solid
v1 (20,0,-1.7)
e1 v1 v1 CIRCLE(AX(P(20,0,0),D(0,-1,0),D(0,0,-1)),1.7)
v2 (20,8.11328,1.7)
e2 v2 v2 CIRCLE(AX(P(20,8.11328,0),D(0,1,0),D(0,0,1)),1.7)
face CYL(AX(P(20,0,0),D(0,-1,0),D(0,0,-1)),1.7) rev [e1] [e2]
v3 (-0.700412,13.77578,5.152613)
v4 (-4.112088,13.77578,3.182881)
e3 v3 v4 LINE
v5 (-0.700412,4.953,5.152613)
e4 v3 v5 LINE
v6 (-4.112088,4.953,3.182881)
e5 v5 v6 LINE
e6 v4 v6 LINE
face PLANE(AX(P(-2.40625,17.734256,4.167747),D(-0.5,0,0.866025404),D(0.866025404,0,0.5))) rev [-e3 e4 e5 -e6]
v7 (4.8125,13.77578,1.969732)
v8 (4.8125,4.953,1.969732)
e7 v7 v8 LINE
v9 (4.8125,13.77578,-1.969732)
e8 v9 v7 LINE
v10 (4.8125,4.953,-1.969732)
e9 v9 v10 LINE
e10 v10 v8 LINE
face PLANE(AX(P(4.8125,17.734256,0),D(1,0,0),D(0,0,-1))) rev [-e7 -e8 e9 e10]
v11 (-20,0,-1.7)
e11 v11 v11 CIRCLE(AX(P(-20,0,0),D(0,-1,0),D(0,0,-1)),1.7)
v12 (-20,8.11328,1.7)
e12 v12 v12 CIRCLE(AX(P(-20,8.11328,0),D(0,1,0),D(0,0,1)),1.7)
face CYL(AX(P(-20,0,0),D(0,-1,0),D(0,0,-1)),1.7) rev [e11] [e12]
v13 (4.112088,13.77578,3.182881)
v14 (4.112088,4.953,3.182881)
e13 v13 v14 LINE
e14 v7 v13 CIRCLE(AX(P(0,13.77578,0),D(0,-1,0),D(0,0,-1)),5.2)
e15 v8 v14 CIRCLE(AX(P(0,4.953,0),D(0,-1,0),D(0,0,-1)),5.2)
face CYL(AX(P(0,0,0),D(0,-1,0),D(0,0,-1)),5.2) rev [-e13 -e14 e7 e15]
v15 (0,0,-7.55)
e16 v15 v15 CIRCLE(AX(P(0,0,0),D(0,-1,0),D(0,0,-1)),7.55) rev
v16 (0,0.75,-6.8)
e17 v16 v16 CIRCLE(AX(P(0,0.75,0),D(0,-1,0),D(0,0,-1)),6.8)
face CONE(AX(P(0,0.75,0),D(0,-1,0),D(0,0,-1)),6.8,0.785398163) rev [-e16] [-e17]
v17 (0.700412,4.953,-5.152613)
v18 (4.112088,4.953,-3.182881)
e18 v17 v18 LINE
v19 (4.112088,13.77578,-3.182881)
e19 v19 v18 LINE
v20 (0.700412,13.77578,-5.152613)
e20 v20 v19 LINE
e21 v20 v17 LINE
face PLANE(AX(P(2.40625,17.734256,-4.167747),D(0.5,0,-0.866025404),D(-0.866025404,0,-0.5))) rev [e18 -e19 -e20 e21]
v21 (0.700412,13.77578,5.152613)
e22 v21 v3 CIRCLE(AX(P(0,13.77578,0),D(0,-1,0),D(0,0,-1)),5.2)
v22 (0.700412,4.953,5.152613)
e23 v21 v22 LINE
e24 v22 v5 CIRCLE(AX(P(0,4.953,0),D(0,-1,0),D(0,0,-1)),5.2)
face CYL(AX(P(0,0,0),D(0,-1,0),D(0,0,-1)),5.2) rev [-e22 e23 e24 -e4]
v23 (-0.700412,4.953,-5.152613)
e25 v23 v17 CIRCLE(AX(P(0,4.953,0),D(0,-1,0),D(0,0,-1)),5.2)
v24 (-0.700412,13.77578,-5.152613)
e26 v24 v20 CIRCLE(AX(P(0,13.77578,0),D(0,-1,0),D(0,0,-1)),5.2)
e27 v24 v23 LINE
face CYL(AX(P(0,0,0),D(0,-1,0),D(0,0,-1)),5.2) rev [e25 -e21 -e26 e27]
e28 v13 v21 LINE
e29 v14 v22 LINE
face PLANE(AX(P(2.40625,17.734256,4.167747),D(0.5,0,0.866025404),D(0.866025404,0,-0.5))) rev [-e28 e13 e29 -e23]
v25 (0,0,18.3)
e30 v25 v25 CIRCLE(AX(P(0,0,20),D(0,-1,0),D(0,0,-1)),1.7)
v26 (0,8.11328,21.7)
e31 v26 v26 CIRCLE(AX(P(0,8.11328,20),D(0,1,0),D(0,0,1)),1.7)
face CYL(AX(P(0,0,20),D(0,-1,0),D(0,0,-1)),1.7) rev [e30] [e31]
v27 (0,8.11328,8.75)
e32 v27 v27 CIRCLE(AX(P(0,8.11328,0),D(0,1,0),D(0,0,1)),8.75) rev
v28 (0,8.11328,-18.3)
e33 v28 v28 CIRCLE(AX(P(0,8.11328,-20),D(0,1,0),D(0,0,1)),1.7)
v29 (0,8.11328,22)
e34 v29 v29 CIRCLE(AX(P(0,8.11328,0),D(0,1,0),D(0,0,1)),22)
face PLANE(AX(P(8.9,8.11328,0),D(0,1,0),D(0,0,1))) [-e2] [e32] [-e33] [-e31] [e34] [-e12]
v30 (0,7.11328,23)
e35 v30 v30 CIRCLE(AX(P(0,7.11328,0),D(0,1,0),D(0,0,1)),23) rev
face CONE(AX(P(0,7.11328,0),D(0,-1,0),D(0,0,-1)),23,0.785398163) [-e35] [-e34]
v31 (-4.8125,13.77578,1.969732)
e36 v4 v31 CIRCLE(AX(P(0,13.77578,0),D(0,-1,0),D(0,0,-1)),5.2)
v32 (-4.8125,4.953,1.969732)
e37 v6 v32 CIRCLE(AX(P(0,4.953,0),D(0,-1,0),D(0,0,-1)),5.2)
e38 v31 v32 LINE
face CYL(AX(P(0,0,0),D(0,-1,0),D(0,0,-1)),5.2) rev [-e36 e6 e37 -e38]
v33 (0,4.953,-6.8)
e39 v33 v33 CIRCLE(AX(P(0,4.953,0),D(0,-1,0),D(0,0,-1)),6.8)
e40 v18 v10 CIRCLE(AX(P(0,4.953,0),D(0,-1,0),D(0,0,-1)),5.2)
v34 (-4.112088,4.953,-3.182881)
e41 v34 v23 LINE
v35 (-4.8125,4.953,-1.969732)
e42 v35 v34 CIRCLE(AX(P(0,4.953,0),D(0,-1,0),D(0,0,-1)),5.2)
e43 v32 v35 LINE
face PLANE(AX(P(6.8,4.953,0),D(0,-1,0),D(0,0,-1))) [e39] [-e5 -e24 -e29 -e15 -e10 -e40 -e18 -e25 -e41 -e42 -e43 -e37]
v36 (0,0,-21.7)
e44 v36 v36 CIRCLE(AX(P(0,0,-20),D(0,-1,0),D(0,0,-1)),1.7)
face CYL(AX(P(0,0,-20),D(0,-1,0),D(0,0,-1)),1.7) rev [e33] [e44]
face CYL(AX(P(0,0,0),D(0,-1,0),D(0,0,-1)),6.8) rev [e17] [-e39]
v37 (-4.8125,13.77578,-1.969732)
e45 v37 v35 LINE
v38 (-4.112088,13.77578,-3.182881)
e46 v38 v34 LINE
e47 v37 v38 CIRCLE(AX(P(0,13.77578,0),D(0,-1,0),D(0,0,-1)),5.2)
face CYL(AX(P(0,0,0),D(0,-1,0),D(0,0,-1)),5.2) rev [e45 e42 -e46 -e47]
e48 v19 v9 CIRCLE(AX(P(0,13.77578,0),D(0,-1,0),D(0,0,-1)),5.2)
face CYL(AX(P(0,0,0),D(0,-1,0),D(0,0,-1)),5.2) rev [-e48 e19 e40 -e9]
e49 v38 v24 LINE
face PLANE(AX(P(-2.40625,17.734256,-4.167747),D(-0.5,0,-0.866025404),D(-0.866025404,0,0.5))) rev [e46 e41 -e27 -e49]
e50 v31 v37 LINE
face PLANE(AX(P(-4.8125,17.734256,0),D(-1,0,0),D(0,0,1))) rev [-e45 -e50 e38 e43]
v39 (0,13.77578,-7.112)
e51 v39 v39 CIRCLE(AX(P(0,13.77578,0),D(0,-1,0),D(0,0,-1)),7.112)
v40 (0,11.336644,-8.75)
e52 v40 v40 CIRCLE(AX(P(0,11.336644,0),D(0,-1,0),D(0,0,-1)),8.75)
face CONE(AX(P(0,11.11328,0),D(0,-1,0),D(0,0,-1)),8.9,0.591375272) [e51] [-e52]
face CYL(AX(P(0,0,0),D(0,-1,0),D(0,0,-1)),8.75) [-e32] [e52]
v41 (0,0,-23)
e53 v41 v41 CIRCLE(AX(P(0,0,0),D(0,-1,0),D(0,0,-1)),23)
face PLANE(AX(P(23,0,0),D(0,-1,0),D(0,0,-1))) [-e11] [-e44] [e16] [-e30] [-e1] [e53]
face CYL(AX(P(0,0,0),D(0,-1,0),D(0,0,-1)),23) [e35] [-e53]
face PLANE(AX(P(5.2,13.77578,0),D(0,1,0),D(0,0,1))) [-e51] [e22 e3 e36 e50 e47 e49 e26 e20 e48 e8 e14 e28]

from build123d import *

# Parameters (mm, degrees)
M3_CLEARANCE_HOLE1_D   = 3.4
CIRPATTERN1_COUNT      = 4
BOSS_EXTRUDE1_START    = -8.82278
BOSS_EXTRUDE1_DEPTH    = 8.82278
CHAMFER1_SIZE          = 0.75
CHAMFER2_SIZE          = 1
MOVE_START             = 8.11328
MOVE_FACE1_OUTLINE_R   = 8.9
MOVE_FACE1_OUTLINE_R_2 = 8.75
MOVE_FACE1_DEPTH       = 3.223364194


# Read off the part's stored shape, not the designer's step: Move Face1
with BuildPart() as part:
    # Sketch1 → Revolve1 (revolve)
    with BuildSketch(Plane.XY, mode=Mode.PRIVATE) as revolve1_sk:
        Polygon((6.8, 0), (6.8, 4.953), (5.2, 4.953), (5.2, 13.77578), (7.112, 13.77578), (8.9, 11.11328), (8.9, 8.11328), (23, 8.11328), (23, 0), align=None)
    revolve(revolve1_sk.sketch.rotate(Axis((0, 0, 0), (0, 1, 0)), 90), axis=Axis((0, 0, 0), (0, 1, 0)))

    # M3 Clearance Hole1 (through all)
    with Locations(Plane.XZ):
        with Locations((-20, 0)):
            m3_clearance_hole1 = Hole(M3_CLEARANCE_HOLE1_D / 2)

    # CirPattern1: M3 Clearance Hole1 ×4 about axis
    cirpattern1_axis = Axis((0, 0, 0), (0, 1, 0))
    for i in range(1, CIRPATTERN1_COUNT):
        add(m3_clearance_hole1.rotate(cirpattern1_axis, i * 360 / CIRPATTERN1_COUNT), mode=Mode.SUBTRACT)

    # Sketch4 → Boss-Extrude1 (add)
    with BuildSketch(Plane.XZ.offset(-4.953).offset(BOSS_EXTRUDE1_START)):
        with BuildLine():
            Line((0.700412138, 5.152613205), (4.112087862, 3.182881307))
            ThreePointArc((4.112087862, 3.182881307), (2.6, 4.5033321), (0.700412138, 5.152613205))
        make_face()
        with BuildLine():
            ThreePointArc((4.8125, -1.969731898), (5.2, 0), (4.8125, 1.969731898))
            Line((4.8125, 1.969731898), (4.8125, -1.969731898))
        make_face()
        with BuildLine():
            Line((-4.112087862, 3.182881307), (-0.700412138, 5.152613205))
            ThreePointArc((-0.700412138, 5.152613205), (-2.6, 4.5033321), (-4.112087862, 3.182881307))
        make_face()
        with BuildLine():
            ThreePointArc((0.700412138, -5.152613205), (2.6, -4.5033321), (4.112087862, -3.182881307))
            Line((4.112087862, -3.182881307), (0.700412138, -5.152613205))
        make_face()
        with BuildLine():
            Line((-4.8125, -1.969731898), (-4.8125, 1.969731898))
            ThreePointArc((-4.8125, 1.969731898), (-5.2, 0), (-4.8125, -1.969731898))
        make_face()
        with BuildLine():
            ThreePointArc((-4.112087862, -3.182881307), (-2.6, -4.5033321), (-0.700412138, -5.152613205))
            Line((-0.700412138, -5.152613205), (-4.112087862, -3.182881307))
        make_face()
    extrude(amount=BOSS_EXTRUDE1_DEPTH)

    # Chamfer1
    chamfer1_edges = [part.edges().sort_by_distance(p)[0] for p in [
        (0, 0, 6.8),
    ]]
    chamfer(chamfer1_edges, length=CHAMFER1_SIZE)

    # Chamfer2
    chamfer2_edges = [part.edges().sort_by_distance(p)[0] for p in [
        (0, 8.11328, 23),
    ]]
    chamfer(chamfer2_edges, length=CHAMFER2_SIZE)

    # Move Face1 outline → Move Face1 (cut)
    with BuildSketch(Plane(origin=(0, 0, 0), x_dir=(1, 0, 0), z_dir=(0, 1, 0)).offset(MOVE_START)):
        Circle(MOVE_FACE1_OUTLINE_R)
        Circle(MOVE_FACE1_OUTLINE_R_2, mode=Mode.SUBTRACT)
    extrude(amount=MOVE_FACE1_DEPTH, mode=Mode.SUBTRACT)


solid = part.part
